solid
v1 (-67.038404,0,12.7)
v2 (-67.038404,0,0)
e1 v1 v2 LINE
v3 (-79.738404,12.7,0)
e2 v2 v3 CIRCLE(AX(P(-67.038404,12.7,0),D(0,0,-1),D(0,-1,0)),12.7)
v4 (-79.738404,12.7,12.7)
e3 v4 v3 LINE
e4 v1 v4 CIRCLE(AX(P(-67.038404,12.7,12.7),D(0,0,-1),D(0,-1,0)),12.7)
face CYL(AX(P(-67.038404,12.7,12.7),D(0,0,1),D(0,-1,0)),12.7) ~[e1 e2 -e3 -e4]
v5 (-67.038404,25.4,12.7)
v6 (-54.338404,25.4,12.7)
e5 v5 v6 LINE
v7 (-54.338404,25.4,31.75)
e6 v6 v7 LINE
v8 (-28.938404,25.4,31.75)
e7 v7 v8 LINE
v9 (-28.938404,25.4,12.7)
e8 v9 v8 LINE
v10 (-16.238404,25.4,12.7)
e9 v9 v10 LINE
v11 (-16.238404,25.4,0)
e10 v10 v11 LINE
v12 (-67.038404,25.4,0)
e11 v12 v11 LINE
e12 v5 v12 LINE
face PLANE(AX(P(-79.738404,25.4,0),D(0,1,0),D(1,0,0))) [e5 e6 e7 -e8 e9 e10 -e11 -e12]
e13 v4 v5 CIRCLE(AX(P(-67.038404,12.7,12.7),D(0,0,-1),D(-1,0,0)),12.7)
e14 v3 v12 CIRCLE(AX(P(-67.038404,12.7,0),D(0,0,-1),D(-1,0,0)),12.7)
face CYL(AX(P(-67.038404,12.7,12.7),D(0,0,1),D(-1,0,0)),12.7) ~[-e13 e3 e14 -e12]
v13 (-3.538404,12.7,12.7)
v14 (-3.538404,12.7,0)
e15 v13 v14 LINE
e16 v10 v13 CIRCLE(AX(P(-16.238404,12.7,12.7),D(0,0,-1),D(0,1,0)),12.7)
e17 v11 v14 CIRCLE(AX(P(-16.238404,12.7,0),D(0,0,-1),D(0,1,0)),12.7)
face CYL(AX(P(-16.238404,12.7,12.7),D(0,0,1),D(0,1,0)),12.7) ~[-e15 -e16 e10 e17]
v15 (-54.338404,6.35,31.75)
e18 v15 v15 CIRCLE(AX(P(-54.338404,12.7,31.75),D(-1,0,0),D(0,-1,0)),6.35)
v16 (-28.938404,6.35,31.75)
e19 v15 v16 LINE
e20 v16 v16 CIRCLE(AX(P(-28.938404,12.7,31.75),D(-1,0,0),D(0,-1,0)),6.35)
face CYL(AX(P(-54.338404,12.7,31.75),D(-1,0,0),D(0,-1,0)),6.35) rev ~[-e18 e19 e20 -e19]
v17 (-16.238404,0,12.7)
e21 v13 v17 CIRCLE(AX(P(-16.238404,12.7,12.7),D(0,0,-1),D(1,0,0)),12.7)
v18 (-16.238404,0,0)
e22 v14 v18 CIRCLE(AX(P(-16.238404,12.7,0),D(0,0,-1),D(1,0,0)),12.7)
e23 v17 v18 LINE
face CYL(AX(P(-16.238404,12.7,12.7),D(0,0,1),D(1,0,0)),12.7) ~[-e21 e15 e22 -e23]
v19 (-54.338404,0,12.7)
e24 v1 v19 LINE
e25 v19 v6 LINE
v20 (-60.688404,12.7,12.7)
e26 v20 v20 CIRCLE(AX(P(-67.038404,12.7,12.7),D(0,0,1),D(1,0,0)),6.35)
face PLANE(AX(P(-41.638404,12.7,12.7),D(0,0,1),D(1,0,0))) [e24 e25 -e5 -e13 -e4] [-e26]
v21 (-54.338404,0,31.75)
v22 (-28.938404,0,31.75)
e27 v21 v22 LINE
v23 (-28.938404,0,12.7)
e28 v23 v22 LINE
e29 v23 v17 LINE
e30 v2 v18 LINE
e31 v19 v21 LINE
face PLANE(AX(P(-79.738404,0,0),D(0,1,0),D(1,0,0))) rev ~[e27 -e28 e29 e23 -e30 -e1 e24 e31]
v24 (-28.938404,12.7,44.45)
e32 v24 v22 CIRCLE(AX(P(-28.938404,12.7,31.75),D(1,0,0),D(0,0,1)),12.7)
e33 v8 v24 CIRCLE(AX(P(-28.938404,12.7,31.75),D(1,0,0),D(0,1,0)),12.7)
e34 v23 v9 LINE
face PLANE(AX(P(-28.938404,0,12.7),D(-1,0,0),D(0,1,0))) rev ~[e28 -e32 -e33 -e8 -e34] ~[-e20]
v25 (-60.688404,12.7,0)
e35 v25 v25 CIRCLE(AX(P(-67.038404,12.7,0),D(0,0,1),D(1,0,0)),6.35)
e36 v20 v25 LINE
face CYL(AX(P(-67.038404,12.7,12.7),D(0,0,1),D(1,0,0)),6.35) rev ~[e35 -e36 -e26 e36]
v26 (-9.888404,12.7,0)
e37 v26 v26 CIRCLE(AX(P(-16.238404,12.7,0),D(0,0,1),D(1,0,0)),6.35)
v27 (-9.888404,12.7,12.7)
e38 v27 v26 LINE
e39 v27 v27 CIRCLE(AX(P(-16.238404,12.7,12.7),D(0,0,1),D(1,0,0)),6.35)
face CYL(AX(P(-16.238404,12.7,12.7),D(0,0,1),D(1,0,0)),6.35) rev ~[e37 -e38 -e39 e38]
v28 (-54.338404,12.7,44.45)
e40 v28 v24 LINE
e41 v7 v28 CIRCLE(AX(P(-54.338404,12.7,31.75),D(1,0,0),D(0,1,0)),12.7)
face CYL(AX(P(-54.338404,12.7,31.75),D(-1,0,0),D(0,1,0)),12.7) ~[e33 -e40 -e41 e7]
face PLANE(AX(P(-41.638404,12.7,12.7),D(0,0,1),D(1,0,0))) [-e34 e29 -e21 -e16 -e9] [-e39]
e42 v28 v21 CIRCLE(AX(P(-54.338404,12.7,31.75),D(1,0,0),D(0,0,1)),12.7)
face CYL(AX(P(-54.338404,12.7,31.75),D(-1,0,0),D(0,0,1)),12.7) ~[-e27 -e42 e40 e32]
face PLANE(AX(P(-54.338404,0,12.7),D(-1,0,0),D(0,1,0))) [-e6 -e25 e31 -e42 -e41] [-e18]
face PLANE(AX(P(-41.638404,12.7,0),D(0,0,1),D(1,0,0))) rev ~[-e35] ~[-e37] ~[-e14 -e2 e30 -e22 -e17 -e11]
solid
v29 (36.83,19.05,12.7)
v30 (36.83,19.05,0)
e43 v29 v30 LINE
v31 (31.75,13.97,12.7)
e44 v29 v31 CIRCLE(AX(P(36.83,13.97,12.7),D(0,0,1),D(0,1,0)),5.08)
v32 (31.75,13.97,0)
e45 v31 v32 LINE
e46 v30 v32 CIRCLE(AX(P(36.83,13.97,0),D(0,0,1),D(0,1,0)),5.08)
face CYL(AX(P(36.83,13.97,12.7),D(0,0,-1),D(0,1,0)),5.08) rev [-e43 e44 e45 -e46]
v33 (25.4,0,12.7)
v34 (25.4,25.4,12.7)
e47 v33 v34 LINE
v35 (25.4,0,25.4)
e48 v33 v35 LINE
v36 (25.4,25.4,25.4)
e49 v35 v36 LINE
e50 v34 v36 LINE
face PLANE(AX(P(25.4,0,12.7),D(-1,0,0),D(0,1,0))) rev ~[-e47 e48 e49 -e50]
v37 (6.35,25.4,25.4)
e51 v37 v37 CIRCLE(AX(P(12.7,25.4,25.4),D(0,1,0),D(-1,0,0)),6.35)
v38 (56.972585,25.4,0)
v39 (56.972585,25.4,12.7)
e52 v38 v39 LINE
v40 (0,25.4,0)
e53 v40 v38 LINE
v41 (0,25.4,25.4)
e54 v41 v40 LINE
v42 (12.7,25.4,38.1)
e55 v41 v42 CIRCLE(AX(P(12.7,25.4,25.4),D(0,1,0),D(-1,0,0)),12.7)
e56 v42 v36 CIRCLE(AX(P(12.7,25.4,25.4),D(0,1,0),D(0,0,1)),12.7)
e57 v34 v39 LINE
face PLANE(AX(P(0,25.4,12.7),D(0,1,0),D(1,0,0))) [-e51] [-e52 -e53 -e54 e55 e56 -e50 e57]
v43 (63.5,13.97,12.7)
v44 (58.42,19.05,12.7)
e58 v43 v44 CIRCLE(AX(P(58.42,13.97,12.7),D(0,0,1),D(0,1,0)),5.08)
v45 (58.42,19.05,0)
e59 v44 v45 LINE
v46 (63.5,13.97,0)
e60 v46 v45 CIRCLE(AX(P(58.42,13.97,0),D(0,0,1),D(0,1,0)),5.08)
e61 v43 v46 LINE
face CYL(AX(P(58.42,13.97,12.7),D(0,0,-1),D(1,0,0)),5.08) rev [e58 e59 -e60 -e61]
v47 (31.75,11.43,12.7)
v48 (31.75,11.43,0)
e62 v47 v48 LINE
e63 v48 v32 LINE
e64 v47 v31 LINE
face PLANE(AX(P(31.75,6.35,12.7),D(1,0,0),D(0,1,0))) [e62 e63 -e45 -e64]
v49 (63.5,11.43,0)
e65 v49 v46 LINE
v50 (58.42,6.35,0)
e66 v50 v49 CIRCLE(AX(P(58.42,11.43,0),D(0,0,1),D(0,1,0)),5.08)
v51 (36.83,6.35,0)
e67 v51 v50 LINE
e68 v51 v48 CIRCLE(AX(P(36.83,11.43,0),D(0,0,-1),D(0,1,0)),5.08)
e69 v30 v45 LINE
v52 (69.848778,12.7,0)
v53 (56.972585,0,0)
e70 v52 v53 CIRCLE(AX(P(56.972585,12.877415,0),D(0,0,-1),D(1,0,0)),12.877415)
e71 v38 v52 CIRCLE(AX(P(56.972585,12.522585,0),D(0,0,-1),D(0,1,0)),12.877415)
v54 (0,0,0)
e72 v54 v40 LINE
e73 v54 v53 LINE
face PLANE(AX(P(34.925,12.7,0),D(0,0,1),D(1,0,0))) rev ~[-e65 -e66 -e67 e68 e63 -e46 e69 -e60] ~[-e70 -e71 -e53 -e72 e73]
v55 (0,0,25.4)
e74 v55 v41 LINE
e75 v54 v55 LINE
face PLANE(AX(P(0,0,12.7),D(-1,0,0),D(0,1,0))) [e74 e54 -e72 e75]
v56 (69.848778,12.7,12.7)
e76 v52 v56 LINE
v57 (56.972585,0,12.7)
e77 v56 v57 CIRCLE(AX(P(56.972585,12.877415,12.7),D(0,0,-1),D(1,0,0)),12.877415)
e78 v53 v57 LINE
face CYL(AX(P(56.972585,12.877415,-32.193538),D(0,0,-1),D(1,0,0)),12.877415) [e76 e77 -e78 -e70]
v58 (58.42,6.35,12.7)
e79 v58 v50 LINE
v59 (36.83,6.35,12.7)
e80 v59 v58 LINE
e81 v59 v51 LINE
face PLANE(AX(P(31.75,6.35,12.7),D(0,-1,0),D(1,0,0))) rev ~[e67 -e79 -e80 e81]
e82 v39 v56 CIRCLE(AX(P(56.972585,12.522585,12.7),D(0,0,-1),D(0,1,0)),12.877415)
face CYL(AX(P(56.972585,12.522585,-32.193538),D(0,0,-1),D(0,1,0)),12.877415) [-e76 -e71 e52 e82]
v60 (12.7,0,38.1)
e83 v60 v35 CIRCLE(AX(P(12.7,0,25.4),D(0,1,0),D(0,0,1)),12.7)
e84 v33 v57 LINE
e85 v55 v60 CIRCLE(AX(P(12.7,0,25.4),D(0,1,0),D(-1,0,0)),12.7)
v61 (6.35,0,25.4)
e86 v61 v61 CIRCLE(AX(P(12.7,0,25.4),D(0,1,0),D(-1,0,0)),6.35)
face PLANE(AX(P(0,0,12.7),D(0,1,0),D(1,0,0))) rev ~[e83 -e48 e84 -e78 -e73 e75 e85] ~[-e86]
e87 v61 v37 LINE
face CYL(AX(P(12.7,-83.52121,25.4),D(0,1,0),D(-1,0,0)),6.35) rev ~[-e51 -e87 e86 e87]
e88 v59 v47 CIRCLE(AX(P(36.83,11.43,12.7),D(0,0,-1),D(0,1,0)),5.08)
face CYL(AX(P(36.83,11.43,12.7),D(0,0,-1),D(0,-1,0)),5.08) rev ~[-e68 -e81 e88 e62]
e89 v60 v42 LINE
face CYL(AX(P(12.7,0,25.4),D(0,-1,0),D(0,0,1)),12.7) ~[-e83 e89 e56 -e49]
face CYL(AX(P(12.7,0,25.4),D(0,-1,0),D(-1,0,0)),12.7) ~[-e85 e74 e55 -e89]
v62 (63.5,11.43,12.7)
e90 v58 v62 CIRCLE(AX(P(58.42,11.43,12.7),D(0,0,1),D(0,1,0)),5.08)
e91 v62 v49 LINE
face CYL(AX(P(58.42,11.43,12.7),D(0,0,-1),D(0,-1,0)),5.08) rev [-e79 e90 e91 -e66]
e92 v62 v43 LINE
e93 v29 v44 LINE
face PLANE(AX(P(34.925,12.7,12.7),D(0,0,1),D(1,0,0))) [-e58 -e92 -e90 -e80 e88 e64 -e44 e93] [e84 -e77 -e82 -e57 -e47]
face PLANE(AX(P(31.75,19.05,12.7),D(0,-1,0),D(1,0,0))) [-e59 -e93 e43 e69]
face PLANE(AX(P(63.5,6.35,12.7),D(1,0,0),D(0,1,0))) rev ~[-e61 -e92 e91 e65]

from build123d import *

# Parameters (mm, degrees)
F0_W         = 69.85
F0_H         = 25.4
F1_DEPTH     = 12.7
F2_W         = 25.4
F2_H         = 25.4
F3_DEPTH     = 25.4
F5_D         = 12.7
F6_W         = 31.75
F6_H         = 12.7
F7_DEPTH     = 12.7
F9_DEPTH     = 25.4
F10_DEPTH    = 25.4
F11_R        = 5.08
F12_T1_DEPTH = 77.0870757085
F13_W        = 76.2
F13_H        = 25.4
F14_DEPTH    = 12.7
F15_W        = 25.4
F15_H        = 25.4
F16_DEPTH    = 31.75
F17_R        = 6.35
F18_DEPTH    = 12.7
F19_R        = 6.35
F20_DEPTH    = 12.7
F21_R        = 6.35
F22_DEPTH    = 25.4


# Not quite as in the source:
# - a fillet or chamfer that OpenCascade refuses, or shapes differently, is made with other operations: its cross-section is extruded or revolved along the edge and cut away or added


with BuildPart() as f1:
    # F0 (on Top) → F1 (new body)
    with BuildSketch(Plane.XY):
        with Locations((34.925, 12.7)):
            Rectangle(F0_W, F0_H)
    extrude(amount=F1_DEPTH)

    # F2 (on face) → F3 (join)
    with BuildSketch(Plane.XY.offset(12.7)):
        with Locations((12.7, 12.7)):
            Rectangle(F2_W, F2_H)
    extrude(amount=F3_DEPTH)

    # F5 (through all)
    with Locations(Plane.XZ):
        with Locations((12.7, 25.4)):
            Hole(F5_D / 2)

    # F6 (on face) → F7 (cut)
    with BuildSketch(Plane.XY.offset(12.7)):
        with Locations((47.625, 12.7)):
            Rectangle(F6_W, F6_H)
    extrude(amount=-F7_DEPTH, mode=Mode.SUBTRACT)

    # F8 (on face) → F9 (cut)
    with BuildSketch(Plane.XZ):
        with BuildLine():
            ThreePointArc((0, 25.4), (3.7197438789, 34.3802561211), (12.7, 38.1))
            Line((12.7, 38.1), (0, 38.1))
            Line((0, 38.1), (0, 25.4))
        make_face()
    extrude(amount=-F9_DEPTH, mode=Mode.SUBTRACT)

    # F8 (on face) → F10 (cut)
    with BuildSketch(Plane.XZ):
        with BuildLine():
            ThreePointArc((12.7, 38.1), (21.6802561211, 34.3802561211), (25.4, 25.4))
            Line((25.4, 25.4), (25.4, 38.1))
            Line((25.4, 38.1), (12.7, 38.1))
        make_face()
    extrude(amount=-F10_DEPTH, mode=Mode.SUBTRACT)

    # F11
    f11_edges = [f1.edges().sort_by_distance(p)[0] for p in [
        (31.75, 19.05, 6.35),
        (31.75, 6.35, 6.35),
        (63.5, 19.05, 6.35),
        (63.5, 6.35, 6.35),
    ]]
    fillet(f11_edges, radius=F11_R)

    # F12: fillet of radius 12.8774151417 on 2 edges, made by hand

    # F12_s2 → F12_t1 (cut)
    with BuildSketch(Plane.XY.offset(-32.1935378542)):
        with BuildLine():
            ThreePointArc((56.9725848583, 25.4), (66.0782924292, 21.6282924292), (69.85, 12.5225848583))
            Line((69.85, 12.5225848583), (69.85, 25.4))
            Line((69.85, 25.4), (56.9725848583, 25.4))
        make_face()
        with BuildLine():
            ThreePointArc((69.85, 12.8774151417), (66.0782924292, 3.7717075708), (56.9725848583, 0))
            Line((56.9725848583, 0), (69.85, 0))
            Line((69.85, 0), (69.85, 12.8774151417))
        make_face()
    extrude(amount=F12_T1_DEPTH, mode=Mode.SUBTRACT)


with BuildPart() as f14:
    # F13 (on Top) → F14 (new body)
    with BuildSketch(Plane.XY):
        with Locations((-41.638404093, 12.7)):
            Rectangle(F13_W, F13_H)
    extrude(amount=F14_DEPTH)

    # F15 (on face) → F16 (join)
    with BuildSketch(Plane.XY.offset(12.7)):
        with Locations((-41.638404093, 12.7)):
            Rectangle(F15_W, F15_H)
    extrude(amount=F16_DEPTH)

    # F17 (on face) → F18 (cut)
    with BuildSketch(Plane.XY.offset(12.7)):
        with Locations((-16.238404093, 12.7)):
            Circle(F17_R)
        with BuildLine():
            ThreePointArc((-16.238404093, 25.4), (-7.2581479719, 21.6802561211), (-3.538404093, 12.7))
            Line((-3.538404093, 12.7), (-3.538404093, 25.4))
            Line((-3.538404093, 25.4), (-16.238404093, 25.4))
        make_face()
        with BuildLine():
            ThreePointArc((-3.538404093, 12.7), (-7.2581479719, 3.7197438789), (-16.238404093, 0))
            Line((-16.238404093, 0), (-3.538404093, 0))
            Line((-3.538404093, 0), (-3.538404093, 12.7))
        make_face()
    extrude(amount=-F18_DEPTH, mode=Mode.SUBTRACT)

    # F19 (on face) → F20 (cut)
    with BuildSketch(Plane.XY.offset(12.7)):
        with Locations((-67.038404093, 12.7)):
            Circle(F19_R)
        with BuildLine():
            ThreePointArc((-79.738404093, 12.7), (-76.0186602141, 21.6802561211), (-67.038404093, 25.4))
            Line((-67.038404093, 25.4), (-79.738404093, 25.4))
            Line((-79.738404093, 25.4), (-79.738404093, 12.7))
        make_face()
        with BuildLine():
            ThreePointArc((-67.038404093, 0), (-76.0186602141, 3.7197438789), (-79.738404093, 12.7))
            Line((-79.738404093, 12.7), (-79.738404093, 0))
            Line((-79.738404093, 0), (-67.038404093, 0))
        make_face()
    extrude(amount=-F20_DEPTH, mode=Mode.SUBTRACT)

    # F21 (on face) → F22 (cut)
    with BuildSketch(Plane(origin=(-54.338404093, 0, 0), x_dir=(0, -1, 0), z_dir=(-1, 0, 0))):
        with Locations((-12.7, 31.75)):
            Circle(F21_R)
        with BuildLine():
            ThreePointArc((-25.4, 31.75), (-21.6802561211, 40.7302561211), (-12.7, 44.45))
            Line((-12.7, 44.45), (-25.4, 44.45))
            Line((-25.4, 44.45), (-25.4, 31.75))
        make_face()
        with BuildLine():
            ThreePointArc((-12.7, 44.45), (-3.7197438789, 40.7302561211), (0, 31.75))
            Line((0, 31.75), (0, 44.45))
            Line((0, 44.45), (-12.7, 44.45))
        make_face()
    extrude(amount=-F22_DEPTH, mode=Mode.SUBTRACT)


solid = Compound([f1.part, f14.part])
